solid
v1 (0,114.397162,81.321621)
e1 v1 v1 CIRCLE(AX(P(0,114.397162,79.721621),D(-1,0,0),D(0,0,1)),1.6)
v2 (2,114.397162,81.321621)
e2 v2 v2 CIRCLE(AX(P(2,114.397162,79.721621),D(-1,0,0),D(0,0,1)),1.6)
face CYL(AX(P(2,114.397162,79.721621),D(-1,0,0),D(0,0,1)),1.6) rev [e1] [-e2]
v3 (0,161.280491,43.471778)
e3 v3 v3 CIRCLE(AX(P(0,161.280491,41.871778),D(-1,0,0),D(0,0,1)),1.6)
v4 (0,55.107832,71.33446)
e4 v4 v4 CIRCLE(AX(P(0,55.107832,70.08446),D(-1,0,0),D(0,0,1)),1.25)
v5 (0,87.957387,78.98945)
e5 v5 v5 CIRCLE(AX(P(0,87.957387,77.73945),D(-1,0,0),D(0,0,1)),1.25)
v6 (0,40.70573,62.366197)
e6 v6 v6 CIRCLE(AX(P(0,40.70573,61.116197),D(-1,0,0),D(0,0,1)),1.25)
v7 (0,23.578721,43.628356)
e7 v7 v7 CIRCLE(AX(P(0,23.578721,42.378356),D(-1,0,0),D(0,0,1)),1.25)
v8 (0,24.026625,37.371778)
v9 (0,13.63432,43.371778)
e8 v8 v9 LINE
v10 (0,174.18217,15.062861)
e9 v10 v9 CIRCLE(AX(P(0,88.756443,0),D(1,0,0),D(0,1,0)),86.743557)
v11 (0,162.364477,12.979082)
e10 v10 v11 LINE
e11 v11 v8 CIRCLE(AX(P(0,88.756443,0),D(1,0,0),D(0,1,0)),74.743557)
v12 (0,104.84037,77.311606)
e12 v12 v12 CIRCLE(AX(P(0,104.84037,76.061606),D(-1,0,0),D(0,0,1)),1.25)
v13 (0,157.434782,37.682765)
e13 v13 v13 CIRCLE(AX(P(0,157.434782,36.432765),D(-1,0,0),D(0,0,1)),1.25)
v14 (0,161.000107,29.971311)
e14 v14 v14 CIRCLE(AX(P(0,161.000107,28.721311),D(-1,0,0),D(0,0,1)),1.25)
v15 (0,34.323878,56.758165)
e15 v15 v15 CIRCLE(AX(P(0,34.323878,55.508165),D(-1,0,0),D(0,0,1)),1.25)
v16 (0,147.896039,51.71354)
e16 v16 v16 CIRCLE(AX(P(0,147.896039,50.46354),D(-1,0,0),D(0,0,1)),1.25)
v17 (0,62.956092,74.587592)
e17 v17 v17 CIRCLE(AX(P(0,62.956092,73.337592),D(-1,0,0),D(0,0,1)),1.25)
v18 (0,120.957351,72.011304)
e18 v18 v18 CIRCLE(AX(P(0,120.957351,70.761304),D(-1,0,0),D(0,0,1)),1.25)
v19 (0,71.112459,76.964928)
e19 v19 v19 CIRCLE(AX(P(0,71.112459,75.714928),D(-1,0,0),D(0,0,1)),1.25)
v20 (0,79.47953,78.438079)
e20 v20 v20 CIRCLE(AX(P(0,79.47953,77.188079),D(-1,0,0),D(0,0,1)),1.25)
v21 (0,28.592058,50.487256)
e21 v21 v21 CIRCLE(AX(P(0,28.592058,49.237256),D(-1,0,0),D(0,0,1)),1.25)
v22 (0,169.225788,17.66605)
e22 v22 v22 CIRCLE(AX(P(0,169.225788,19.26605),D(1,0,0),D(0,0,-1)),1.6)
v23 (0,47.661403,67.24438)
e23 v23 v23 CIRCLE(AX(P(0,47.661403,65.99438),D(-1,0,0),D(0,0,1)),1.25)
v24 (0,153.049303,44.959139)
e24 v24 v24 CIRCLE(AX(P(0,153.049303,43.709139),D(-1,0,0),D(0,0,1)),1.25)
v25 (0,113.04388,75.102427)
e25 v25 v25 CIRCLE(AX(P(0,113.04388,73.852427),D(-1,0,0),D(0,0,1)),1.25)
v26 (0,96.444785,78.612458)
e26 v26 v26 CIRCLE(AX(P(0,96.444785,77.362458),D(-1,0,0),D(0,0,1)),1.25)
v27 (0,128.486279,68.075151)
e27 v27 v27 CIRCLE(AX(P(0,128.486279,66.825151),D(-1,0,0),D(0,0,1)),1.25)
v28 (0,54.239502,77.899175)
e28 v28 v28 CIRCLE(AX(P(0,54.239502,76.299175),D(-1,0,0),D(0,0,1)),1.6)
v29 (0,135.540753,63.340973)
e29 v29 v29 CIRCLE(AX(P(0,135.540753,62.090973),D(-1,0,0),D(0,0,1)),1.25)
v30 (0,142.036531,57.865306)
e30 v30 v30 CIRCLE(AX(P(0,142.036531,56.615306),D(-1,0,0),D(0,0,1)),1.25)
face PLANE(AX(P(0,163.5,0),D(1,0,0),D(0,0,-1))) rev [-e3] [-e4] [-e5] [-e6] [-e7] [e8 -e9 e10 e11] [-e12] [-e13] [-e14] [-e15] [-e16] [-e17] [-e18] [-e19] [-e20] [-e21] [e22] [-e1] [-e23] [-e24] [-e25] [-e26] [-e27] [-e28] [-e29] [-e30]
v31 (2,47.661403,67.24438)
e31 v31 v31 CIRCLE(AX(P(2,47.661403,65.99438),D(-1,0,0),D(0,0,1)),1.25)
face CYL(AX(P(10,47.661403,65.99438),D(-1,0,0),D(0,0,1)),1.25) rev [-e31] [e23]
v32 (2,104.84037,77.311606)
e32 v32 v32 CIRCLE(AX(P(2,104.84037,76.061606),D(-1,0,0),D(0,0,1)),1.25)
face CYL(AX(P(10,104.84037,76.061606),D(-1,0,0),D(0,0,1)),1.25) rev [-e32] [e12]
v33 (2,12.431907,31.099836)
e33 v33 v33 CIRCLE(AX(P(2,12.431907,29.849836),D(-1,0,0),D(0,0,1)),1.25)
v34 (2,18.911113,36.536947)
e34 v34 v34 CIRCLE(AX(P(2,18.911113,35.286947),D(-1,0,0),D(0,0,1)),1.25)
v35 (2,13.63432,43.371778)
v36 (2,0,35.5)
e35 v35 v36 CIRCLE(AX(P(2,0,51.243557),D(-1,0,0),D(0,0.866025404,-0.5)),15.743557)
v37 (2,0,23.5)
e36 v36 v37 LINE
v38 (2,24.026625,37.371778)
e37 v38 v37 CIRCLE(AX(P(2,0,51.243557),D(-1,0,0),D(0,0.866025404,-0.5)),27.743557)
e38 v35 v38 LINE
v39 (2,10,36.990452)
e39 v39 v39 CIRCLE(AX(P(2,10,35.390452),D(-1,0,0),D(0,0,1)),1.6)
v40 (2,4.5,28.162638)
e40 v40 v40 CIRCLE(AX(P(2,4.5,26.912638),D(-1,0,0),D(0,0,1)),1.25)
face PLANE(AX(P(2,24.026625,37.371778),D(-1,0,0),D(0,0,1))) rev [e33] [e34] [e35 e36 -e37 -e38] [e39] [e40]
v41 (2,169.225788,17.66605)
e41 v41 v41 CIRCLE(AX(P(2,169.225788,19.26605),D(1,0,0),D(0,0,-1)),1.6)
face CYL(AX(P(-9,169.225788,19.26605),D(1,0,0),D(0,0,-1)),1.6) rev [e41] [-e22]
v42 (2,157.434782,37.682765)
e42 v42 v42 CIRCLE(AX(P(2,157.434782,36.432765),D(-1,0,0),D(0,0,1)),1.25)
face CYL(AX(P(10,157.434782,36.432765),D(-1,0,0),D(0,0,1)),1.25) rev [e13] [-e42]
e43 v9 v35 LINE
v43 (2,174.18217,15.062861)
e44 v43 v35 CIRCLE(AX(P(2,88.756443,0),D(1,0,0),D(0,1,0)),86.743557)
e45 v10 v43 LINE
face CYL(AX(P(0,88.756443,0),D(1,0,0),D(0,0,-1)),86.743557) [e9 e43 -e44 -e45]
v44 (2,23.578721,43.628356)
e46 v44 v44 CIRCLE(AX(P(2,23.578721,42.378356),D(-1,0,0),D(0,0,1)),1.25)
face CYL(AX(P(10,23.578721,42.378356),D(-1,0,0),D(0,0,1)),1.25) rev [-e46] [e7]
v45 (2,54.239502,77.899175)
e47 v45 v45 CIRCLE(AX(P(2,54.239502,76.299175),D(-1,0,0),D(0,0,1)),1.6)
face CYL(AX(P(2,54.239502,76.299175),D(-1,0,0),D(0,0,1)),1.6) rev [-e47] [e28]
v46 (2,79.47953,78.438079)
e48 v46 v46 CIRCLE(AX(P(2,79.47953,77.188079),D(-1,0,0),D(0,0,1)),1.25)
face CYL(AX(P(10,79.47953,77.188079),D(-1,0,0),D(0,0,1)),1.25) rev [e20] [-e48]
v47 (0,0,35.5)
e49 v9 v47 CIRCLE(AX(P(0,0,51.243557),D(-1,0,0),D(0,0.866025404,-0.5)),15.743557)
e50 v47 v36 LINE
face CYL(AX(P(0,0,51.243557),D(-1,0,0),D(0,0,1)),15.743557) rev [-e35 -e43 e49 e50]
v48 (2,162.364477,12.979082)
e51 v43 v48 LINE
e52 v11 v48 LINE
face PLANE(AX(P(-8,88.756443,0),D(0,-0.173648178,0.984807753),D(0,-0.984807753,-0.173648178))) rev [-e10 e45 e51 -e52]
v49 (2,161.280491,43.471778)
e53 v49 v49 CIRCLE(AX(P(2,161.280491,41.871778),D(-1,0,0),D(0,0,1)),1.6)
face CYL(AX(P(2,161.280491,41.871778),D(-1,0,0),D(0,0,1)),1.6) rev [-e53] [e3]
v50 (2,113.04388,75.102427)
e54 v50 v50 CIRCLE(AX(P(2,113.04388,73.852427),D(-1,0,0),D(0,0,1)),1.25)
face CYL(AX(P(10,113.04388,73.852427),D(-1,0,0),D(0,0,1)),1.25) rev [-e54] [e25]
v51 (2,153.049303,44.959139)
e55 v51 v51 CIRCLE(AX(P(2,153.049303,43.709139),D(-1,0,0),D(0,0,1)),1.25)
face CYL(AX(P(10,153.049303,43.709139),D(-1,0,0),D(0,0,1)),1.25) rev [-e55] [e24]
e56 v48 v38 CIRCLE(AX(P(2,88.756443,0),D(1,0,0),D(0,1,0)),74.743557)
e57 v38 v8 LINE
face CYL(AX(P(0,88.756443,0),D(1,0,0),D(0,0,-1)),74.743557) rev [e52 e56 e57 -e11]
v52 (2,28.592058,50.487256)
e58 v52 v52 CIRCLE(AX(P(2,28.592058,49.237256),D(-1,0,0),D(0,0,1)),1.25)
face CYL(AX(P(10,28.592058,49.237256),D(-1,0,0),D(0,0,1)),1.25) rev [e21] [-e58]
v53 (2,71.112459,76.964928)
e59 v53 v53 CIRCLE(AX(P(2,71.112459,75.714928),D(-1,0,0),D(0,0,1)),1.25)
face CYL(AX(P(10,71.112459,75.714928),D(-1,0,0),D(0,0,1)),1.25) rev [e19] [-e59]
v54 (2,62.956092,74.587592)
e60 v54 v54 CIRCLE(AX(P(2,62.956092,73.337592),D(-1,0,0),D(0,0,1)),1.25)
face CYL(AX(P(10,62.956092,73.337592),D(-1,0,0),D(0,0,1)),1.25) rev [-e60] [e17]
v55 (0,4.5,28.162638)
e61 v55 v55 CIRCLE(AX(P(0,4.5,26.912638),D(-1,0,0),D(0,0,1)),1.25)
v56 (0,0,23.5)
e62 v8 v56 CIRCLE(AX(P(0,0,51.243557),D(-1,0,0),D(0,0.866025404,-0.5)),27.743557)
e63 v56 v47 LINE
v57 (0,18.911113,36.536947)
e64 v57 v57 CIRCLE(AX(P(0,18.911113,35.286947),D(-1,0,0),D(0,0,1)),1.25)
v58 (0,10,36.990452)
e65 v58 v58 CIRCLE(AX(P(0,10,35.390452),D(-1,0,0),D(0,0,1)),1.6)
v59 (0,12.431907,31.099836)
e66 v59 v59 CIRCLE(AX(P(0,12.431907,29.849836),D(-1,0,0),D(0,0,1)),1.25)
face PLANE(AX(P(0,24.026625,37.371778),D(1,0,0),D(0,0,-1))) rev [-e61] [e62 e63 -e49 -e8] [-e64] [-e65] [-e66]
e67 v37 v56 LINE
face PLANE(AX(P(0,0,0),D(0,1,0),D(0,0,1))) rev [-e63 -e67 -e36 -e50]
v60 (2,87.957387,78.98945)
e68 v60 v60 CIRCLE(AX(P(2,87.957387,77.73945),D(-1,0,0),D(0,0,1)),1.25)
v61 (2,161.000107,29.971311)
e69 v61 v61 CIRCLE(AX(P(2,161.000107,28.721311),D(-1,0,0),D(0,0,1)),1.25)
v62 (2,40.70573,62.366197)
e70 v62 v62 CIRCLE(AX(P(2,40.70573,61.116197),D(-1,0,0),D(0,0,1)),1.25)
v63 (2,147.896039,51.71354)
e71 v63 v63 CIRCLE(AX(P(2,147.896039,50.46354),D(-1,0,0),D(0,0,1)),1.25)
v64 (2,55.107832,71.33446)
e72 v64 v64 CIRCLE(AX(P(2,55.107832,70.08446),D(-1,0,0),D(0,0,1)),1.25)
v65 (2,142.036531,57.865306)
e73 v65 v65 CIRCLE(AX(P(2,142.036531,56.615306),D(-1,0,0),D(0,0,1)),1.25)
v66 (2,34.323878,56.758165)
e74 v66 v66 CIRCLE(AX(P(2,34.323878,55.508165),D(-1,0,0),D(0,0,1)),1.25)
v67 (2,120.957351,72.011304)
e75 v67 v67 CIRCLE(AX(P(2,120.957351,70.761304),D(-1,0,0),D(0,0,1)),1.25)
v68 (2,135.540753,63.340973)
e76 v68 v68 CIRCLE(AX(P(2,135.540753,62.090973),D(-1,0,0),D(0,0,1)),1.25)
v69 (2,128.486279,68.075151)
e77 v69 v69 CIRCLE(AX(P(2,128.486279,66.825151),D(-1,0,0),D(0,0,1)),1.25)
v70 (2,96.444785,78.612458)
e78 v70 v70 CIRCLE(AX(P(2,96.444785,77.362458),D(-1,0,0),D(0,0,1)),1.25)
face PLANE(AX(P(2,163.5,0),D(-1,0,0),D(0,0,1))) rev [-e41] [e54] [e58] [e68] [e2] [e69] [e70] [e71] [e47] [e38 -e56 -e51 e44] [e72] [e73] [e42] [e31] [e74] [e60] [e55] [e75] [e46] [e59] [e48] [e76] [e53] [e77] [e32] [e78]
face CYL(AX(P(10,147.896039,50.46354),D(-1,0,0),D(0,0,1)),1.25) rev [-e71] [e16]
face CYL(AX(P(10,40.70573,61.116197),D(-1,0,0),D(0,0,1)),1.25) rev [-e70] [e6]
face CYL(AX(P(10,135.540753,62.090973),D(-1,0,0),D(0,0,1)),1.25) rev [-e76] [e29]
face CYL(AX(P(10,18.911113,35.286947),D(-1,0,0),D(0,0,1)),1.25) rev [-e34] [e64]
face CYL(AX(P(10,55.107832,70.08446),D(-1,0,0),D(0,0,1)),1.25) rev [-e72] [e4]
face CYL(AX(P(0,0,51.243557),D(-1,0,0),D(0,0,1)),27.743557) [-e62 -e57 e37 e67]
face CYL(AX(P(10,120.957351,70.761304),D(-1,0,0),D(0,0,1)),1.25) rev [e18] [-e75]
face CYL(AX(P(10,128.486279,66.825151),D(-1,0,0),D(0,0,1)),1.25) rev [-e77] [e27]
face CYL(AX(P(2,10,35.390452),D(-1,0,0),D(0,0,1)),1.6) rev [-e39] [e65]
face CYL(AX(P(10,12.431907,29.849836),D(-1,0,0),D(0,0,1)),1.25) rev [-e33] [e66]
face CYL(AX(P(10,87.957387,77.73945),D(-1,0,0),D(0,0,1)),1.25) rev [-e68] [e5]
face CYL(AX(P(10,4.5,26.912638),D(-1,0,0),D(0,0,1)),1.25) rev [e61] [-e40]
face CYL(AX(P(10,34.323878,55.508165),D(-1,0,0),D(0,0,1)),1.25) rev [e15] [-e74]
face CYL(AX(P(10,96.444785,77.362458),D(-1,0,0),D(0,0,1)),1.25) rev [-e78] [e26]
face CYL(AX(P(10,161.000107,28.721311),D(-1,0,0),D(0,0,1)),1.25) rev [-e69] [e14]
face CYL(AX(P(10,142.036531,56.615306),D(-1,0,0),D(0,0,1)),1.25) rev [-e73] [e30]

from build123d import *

# Parameters (mm, degrees)
SKETCH2_W             = 2
SKETCH2_H             = 12
CUT_EXTRUDE1_DEPTH    = 10
SKETCH4_R             = 1.25
CUT_EXTRUDE2_DEPTH    = 10
CRVPATTERN2_OUTLINE_R = 1.25
CRVPATTERN2_DEPTH     = 2
SKETCH7_R             = 1.6
CUT_EXTRUDE3_DEPTH    = 2
SKETCH8_R             = 1.6
CUT_EXTRUDE4_DEPTH    = 11


# Read off the part's stored shape, not the designer's step: CrvPattern2
with BuildPart() as part:
    # Sweep1: sweep along a path in Sketch1
    with BuildLine(Plane(origin=(0, 0, 0), x_dir=(0, 0, -1), z_dir=(1, 0, 0))) as sweep1_path:
        ThreePointArc((0, 163.5), (-72.196731601, 108.101499399), (-37.371778265, 24.026624746))
        ThreePointArc((-37.371778265, 24.026624746), (-27.216931784, 13.871778265), (-23.5, 0))
    # Sketch2 → Sweep1 (sweep)
    with BuildSketch(Plane(origin=(0, 0, 0), x_dir=(1, 0, 0), z_dir=(0, 1, 0))):
        with Locations((1, -29.5)):
            Rectangle(SKETCH2_W, SKETCH2_H)
    sweep(path=sweep1_path.line)

    # Sketch3 → Cut-Extrude1 (cut)
    with BuildSketch(Plane(origin=(2, 0, 0), x_dir=(0, 0, -1), z_dir=(1, 0, 0))):
        with BuildLine():
            Line((0, 88.75644347), (-15.062860516, 174.182170465))
            ThreePointArc((-15.062860516, 174.182170465), (-7.560199098, 175.169914579), (0, 175.5))
            Line((0, 175.5), (0, 88.75644347))
        make_face()
    extrude(amount=-CUT_EXTRUDE1_DEPTH, mode=Mode.SUBTRACT)

    # Sketch4 → Cut-Extrude2 (cut)
    with BuildSketch(Plane.ZY):
        with Locations((26.912638139, 4.5)):
            Circle(SKETCH4_R)
    extrude(amount=-CUT_EXTRUDE2_DEPTH, mode=Mode.SUBTRACT)

    # CrvPattern2 outline → CrvPattern2 (cut)
    with BuildSketch(Plane.YZ):
        with Locations((18.911112769, 35.286946502)):
            Circle(CRVPATTERN2_OUTLINE_R)
        with Locations((12.43190695, 29.849835971)):
            Circle(CRVPATTERN2_OUTLINE_R)
        with Locations((161.000106646, 28.721311128)):
            Circle(CRVPATTERN2_OUTLINE_R)
        with Locations((157.434782313, 36.432764864)):
            Circle(CRVPATTERN2_OUTLINE_R)
        with Locations((153.049302567, 43.709139217)):
            Circle(CRVPATTERN2_OUTLINE_R)
        with Locations((147.896038722, 50.463539862)):
            Circle(CRVPATTERN2_OUTLINE_R)
        with Locations((142.036530957, 56.615305875)):
            Circle(CRVPATTERN2_OUTLINE_R)
        with Locations((135.540753402, 62.090972984)):
            Circle(CRVPATTERN2_OUTLINE_R)
        with Locations((128.486278509, 66.825150876)):
            Circle(CRVPATTERN2_OUTLINE_R)
        with Locations((120.957350684, 70.76130409)):
            Circle(CRVPATTERN2_OUTLINE_R)
        with Locations((113.043880237, 73.852427158)):
            Circle(CRVPATTERN2_OUTLINE_R)
        with Locations((104.840369684, 76.061605948)):
            Circle(CRVPATTERN2_OUTLINE_R)
        with Locations((96.44478519, 77.362458489)):
            Circle(CRVPATTERN2_OUTLINE_R)
        with Locations((87.957386665, 77.739450025)):
            Circle(CRVPATTERN2_OUTLINE_R)
        with Locations((79.479530462, 77.188078529)):
            Circle(CRVPATTERN2_OUTLINE_R)
        with Locations((71.112458978, 75.714928469)):
            Circle(CRVPATTERN2_OUTLINE_R)
        with Locations((62.956091619, 73.337592177)):
            Circle(CRVPATTERN2_OUTLINE_R)
        with Locations((55.107831572, 70.084459755)):
            Circle(CRVPATTERN2_OUTLINE_R)
        with Locations((47.661402606, 65.994380051)):
            Circle(CRVPATTERN2_OUTLINE_R)
        with Locations((40.705729836, 61.116196717)):
            Circle(CRVPATTERN2_OUTLINE_R)
        with Locations((34.323877772, 55.508164926)):
            Circle(CRVPATTERN2_OUTLINE_R)
        with Locations((28.592058371, 49.237255687)):
            Circle(CRVPATTERN2_OUTLINE_R)
        with Locations((23.578720911, 42.378356079)):
            Circle(CRVPATTERN2_OUTLINE_R)
    extrude(amount=CRVPATTERN2_DEPTH, mode=Mode.SUBTRACT)

    # Sketch7 → Cut-Extrude3 (cut)
    with BuildSketch(Plane.ZY):
        with Locations((35.390452374, 10)):
            Circle(SKETCH7_R)
        with Locations((76.299174561, 54.239502389)):
            Circle(SKETCH7_R)
        with Locations((79.721620809, 114.397161787)):
            Circle(SKETCH7_R)
        with Locations((41.871778265, 161.280490828)):
            Circle(SKETCH7_R)
    extrude(amount=-CUT_EXTRUDE3_DEPTH, mode=Mode.SUBTRACT)

    # Sketch8 → Cut-Extrude4 (cut)
    with BuildSketch(Plane(origin=(2, 0, 0), x_dir=(0, 0, -1), z_dir=(1, 0, 0))):
        with Locations((-19.266049694, 169.225788418)):
            Circle(SKETCH8_R)
    extrude(amount=-CUT_EXTRUDE4_DEPTH, mode=Mode.SUBTRACT)


solid = part.part
